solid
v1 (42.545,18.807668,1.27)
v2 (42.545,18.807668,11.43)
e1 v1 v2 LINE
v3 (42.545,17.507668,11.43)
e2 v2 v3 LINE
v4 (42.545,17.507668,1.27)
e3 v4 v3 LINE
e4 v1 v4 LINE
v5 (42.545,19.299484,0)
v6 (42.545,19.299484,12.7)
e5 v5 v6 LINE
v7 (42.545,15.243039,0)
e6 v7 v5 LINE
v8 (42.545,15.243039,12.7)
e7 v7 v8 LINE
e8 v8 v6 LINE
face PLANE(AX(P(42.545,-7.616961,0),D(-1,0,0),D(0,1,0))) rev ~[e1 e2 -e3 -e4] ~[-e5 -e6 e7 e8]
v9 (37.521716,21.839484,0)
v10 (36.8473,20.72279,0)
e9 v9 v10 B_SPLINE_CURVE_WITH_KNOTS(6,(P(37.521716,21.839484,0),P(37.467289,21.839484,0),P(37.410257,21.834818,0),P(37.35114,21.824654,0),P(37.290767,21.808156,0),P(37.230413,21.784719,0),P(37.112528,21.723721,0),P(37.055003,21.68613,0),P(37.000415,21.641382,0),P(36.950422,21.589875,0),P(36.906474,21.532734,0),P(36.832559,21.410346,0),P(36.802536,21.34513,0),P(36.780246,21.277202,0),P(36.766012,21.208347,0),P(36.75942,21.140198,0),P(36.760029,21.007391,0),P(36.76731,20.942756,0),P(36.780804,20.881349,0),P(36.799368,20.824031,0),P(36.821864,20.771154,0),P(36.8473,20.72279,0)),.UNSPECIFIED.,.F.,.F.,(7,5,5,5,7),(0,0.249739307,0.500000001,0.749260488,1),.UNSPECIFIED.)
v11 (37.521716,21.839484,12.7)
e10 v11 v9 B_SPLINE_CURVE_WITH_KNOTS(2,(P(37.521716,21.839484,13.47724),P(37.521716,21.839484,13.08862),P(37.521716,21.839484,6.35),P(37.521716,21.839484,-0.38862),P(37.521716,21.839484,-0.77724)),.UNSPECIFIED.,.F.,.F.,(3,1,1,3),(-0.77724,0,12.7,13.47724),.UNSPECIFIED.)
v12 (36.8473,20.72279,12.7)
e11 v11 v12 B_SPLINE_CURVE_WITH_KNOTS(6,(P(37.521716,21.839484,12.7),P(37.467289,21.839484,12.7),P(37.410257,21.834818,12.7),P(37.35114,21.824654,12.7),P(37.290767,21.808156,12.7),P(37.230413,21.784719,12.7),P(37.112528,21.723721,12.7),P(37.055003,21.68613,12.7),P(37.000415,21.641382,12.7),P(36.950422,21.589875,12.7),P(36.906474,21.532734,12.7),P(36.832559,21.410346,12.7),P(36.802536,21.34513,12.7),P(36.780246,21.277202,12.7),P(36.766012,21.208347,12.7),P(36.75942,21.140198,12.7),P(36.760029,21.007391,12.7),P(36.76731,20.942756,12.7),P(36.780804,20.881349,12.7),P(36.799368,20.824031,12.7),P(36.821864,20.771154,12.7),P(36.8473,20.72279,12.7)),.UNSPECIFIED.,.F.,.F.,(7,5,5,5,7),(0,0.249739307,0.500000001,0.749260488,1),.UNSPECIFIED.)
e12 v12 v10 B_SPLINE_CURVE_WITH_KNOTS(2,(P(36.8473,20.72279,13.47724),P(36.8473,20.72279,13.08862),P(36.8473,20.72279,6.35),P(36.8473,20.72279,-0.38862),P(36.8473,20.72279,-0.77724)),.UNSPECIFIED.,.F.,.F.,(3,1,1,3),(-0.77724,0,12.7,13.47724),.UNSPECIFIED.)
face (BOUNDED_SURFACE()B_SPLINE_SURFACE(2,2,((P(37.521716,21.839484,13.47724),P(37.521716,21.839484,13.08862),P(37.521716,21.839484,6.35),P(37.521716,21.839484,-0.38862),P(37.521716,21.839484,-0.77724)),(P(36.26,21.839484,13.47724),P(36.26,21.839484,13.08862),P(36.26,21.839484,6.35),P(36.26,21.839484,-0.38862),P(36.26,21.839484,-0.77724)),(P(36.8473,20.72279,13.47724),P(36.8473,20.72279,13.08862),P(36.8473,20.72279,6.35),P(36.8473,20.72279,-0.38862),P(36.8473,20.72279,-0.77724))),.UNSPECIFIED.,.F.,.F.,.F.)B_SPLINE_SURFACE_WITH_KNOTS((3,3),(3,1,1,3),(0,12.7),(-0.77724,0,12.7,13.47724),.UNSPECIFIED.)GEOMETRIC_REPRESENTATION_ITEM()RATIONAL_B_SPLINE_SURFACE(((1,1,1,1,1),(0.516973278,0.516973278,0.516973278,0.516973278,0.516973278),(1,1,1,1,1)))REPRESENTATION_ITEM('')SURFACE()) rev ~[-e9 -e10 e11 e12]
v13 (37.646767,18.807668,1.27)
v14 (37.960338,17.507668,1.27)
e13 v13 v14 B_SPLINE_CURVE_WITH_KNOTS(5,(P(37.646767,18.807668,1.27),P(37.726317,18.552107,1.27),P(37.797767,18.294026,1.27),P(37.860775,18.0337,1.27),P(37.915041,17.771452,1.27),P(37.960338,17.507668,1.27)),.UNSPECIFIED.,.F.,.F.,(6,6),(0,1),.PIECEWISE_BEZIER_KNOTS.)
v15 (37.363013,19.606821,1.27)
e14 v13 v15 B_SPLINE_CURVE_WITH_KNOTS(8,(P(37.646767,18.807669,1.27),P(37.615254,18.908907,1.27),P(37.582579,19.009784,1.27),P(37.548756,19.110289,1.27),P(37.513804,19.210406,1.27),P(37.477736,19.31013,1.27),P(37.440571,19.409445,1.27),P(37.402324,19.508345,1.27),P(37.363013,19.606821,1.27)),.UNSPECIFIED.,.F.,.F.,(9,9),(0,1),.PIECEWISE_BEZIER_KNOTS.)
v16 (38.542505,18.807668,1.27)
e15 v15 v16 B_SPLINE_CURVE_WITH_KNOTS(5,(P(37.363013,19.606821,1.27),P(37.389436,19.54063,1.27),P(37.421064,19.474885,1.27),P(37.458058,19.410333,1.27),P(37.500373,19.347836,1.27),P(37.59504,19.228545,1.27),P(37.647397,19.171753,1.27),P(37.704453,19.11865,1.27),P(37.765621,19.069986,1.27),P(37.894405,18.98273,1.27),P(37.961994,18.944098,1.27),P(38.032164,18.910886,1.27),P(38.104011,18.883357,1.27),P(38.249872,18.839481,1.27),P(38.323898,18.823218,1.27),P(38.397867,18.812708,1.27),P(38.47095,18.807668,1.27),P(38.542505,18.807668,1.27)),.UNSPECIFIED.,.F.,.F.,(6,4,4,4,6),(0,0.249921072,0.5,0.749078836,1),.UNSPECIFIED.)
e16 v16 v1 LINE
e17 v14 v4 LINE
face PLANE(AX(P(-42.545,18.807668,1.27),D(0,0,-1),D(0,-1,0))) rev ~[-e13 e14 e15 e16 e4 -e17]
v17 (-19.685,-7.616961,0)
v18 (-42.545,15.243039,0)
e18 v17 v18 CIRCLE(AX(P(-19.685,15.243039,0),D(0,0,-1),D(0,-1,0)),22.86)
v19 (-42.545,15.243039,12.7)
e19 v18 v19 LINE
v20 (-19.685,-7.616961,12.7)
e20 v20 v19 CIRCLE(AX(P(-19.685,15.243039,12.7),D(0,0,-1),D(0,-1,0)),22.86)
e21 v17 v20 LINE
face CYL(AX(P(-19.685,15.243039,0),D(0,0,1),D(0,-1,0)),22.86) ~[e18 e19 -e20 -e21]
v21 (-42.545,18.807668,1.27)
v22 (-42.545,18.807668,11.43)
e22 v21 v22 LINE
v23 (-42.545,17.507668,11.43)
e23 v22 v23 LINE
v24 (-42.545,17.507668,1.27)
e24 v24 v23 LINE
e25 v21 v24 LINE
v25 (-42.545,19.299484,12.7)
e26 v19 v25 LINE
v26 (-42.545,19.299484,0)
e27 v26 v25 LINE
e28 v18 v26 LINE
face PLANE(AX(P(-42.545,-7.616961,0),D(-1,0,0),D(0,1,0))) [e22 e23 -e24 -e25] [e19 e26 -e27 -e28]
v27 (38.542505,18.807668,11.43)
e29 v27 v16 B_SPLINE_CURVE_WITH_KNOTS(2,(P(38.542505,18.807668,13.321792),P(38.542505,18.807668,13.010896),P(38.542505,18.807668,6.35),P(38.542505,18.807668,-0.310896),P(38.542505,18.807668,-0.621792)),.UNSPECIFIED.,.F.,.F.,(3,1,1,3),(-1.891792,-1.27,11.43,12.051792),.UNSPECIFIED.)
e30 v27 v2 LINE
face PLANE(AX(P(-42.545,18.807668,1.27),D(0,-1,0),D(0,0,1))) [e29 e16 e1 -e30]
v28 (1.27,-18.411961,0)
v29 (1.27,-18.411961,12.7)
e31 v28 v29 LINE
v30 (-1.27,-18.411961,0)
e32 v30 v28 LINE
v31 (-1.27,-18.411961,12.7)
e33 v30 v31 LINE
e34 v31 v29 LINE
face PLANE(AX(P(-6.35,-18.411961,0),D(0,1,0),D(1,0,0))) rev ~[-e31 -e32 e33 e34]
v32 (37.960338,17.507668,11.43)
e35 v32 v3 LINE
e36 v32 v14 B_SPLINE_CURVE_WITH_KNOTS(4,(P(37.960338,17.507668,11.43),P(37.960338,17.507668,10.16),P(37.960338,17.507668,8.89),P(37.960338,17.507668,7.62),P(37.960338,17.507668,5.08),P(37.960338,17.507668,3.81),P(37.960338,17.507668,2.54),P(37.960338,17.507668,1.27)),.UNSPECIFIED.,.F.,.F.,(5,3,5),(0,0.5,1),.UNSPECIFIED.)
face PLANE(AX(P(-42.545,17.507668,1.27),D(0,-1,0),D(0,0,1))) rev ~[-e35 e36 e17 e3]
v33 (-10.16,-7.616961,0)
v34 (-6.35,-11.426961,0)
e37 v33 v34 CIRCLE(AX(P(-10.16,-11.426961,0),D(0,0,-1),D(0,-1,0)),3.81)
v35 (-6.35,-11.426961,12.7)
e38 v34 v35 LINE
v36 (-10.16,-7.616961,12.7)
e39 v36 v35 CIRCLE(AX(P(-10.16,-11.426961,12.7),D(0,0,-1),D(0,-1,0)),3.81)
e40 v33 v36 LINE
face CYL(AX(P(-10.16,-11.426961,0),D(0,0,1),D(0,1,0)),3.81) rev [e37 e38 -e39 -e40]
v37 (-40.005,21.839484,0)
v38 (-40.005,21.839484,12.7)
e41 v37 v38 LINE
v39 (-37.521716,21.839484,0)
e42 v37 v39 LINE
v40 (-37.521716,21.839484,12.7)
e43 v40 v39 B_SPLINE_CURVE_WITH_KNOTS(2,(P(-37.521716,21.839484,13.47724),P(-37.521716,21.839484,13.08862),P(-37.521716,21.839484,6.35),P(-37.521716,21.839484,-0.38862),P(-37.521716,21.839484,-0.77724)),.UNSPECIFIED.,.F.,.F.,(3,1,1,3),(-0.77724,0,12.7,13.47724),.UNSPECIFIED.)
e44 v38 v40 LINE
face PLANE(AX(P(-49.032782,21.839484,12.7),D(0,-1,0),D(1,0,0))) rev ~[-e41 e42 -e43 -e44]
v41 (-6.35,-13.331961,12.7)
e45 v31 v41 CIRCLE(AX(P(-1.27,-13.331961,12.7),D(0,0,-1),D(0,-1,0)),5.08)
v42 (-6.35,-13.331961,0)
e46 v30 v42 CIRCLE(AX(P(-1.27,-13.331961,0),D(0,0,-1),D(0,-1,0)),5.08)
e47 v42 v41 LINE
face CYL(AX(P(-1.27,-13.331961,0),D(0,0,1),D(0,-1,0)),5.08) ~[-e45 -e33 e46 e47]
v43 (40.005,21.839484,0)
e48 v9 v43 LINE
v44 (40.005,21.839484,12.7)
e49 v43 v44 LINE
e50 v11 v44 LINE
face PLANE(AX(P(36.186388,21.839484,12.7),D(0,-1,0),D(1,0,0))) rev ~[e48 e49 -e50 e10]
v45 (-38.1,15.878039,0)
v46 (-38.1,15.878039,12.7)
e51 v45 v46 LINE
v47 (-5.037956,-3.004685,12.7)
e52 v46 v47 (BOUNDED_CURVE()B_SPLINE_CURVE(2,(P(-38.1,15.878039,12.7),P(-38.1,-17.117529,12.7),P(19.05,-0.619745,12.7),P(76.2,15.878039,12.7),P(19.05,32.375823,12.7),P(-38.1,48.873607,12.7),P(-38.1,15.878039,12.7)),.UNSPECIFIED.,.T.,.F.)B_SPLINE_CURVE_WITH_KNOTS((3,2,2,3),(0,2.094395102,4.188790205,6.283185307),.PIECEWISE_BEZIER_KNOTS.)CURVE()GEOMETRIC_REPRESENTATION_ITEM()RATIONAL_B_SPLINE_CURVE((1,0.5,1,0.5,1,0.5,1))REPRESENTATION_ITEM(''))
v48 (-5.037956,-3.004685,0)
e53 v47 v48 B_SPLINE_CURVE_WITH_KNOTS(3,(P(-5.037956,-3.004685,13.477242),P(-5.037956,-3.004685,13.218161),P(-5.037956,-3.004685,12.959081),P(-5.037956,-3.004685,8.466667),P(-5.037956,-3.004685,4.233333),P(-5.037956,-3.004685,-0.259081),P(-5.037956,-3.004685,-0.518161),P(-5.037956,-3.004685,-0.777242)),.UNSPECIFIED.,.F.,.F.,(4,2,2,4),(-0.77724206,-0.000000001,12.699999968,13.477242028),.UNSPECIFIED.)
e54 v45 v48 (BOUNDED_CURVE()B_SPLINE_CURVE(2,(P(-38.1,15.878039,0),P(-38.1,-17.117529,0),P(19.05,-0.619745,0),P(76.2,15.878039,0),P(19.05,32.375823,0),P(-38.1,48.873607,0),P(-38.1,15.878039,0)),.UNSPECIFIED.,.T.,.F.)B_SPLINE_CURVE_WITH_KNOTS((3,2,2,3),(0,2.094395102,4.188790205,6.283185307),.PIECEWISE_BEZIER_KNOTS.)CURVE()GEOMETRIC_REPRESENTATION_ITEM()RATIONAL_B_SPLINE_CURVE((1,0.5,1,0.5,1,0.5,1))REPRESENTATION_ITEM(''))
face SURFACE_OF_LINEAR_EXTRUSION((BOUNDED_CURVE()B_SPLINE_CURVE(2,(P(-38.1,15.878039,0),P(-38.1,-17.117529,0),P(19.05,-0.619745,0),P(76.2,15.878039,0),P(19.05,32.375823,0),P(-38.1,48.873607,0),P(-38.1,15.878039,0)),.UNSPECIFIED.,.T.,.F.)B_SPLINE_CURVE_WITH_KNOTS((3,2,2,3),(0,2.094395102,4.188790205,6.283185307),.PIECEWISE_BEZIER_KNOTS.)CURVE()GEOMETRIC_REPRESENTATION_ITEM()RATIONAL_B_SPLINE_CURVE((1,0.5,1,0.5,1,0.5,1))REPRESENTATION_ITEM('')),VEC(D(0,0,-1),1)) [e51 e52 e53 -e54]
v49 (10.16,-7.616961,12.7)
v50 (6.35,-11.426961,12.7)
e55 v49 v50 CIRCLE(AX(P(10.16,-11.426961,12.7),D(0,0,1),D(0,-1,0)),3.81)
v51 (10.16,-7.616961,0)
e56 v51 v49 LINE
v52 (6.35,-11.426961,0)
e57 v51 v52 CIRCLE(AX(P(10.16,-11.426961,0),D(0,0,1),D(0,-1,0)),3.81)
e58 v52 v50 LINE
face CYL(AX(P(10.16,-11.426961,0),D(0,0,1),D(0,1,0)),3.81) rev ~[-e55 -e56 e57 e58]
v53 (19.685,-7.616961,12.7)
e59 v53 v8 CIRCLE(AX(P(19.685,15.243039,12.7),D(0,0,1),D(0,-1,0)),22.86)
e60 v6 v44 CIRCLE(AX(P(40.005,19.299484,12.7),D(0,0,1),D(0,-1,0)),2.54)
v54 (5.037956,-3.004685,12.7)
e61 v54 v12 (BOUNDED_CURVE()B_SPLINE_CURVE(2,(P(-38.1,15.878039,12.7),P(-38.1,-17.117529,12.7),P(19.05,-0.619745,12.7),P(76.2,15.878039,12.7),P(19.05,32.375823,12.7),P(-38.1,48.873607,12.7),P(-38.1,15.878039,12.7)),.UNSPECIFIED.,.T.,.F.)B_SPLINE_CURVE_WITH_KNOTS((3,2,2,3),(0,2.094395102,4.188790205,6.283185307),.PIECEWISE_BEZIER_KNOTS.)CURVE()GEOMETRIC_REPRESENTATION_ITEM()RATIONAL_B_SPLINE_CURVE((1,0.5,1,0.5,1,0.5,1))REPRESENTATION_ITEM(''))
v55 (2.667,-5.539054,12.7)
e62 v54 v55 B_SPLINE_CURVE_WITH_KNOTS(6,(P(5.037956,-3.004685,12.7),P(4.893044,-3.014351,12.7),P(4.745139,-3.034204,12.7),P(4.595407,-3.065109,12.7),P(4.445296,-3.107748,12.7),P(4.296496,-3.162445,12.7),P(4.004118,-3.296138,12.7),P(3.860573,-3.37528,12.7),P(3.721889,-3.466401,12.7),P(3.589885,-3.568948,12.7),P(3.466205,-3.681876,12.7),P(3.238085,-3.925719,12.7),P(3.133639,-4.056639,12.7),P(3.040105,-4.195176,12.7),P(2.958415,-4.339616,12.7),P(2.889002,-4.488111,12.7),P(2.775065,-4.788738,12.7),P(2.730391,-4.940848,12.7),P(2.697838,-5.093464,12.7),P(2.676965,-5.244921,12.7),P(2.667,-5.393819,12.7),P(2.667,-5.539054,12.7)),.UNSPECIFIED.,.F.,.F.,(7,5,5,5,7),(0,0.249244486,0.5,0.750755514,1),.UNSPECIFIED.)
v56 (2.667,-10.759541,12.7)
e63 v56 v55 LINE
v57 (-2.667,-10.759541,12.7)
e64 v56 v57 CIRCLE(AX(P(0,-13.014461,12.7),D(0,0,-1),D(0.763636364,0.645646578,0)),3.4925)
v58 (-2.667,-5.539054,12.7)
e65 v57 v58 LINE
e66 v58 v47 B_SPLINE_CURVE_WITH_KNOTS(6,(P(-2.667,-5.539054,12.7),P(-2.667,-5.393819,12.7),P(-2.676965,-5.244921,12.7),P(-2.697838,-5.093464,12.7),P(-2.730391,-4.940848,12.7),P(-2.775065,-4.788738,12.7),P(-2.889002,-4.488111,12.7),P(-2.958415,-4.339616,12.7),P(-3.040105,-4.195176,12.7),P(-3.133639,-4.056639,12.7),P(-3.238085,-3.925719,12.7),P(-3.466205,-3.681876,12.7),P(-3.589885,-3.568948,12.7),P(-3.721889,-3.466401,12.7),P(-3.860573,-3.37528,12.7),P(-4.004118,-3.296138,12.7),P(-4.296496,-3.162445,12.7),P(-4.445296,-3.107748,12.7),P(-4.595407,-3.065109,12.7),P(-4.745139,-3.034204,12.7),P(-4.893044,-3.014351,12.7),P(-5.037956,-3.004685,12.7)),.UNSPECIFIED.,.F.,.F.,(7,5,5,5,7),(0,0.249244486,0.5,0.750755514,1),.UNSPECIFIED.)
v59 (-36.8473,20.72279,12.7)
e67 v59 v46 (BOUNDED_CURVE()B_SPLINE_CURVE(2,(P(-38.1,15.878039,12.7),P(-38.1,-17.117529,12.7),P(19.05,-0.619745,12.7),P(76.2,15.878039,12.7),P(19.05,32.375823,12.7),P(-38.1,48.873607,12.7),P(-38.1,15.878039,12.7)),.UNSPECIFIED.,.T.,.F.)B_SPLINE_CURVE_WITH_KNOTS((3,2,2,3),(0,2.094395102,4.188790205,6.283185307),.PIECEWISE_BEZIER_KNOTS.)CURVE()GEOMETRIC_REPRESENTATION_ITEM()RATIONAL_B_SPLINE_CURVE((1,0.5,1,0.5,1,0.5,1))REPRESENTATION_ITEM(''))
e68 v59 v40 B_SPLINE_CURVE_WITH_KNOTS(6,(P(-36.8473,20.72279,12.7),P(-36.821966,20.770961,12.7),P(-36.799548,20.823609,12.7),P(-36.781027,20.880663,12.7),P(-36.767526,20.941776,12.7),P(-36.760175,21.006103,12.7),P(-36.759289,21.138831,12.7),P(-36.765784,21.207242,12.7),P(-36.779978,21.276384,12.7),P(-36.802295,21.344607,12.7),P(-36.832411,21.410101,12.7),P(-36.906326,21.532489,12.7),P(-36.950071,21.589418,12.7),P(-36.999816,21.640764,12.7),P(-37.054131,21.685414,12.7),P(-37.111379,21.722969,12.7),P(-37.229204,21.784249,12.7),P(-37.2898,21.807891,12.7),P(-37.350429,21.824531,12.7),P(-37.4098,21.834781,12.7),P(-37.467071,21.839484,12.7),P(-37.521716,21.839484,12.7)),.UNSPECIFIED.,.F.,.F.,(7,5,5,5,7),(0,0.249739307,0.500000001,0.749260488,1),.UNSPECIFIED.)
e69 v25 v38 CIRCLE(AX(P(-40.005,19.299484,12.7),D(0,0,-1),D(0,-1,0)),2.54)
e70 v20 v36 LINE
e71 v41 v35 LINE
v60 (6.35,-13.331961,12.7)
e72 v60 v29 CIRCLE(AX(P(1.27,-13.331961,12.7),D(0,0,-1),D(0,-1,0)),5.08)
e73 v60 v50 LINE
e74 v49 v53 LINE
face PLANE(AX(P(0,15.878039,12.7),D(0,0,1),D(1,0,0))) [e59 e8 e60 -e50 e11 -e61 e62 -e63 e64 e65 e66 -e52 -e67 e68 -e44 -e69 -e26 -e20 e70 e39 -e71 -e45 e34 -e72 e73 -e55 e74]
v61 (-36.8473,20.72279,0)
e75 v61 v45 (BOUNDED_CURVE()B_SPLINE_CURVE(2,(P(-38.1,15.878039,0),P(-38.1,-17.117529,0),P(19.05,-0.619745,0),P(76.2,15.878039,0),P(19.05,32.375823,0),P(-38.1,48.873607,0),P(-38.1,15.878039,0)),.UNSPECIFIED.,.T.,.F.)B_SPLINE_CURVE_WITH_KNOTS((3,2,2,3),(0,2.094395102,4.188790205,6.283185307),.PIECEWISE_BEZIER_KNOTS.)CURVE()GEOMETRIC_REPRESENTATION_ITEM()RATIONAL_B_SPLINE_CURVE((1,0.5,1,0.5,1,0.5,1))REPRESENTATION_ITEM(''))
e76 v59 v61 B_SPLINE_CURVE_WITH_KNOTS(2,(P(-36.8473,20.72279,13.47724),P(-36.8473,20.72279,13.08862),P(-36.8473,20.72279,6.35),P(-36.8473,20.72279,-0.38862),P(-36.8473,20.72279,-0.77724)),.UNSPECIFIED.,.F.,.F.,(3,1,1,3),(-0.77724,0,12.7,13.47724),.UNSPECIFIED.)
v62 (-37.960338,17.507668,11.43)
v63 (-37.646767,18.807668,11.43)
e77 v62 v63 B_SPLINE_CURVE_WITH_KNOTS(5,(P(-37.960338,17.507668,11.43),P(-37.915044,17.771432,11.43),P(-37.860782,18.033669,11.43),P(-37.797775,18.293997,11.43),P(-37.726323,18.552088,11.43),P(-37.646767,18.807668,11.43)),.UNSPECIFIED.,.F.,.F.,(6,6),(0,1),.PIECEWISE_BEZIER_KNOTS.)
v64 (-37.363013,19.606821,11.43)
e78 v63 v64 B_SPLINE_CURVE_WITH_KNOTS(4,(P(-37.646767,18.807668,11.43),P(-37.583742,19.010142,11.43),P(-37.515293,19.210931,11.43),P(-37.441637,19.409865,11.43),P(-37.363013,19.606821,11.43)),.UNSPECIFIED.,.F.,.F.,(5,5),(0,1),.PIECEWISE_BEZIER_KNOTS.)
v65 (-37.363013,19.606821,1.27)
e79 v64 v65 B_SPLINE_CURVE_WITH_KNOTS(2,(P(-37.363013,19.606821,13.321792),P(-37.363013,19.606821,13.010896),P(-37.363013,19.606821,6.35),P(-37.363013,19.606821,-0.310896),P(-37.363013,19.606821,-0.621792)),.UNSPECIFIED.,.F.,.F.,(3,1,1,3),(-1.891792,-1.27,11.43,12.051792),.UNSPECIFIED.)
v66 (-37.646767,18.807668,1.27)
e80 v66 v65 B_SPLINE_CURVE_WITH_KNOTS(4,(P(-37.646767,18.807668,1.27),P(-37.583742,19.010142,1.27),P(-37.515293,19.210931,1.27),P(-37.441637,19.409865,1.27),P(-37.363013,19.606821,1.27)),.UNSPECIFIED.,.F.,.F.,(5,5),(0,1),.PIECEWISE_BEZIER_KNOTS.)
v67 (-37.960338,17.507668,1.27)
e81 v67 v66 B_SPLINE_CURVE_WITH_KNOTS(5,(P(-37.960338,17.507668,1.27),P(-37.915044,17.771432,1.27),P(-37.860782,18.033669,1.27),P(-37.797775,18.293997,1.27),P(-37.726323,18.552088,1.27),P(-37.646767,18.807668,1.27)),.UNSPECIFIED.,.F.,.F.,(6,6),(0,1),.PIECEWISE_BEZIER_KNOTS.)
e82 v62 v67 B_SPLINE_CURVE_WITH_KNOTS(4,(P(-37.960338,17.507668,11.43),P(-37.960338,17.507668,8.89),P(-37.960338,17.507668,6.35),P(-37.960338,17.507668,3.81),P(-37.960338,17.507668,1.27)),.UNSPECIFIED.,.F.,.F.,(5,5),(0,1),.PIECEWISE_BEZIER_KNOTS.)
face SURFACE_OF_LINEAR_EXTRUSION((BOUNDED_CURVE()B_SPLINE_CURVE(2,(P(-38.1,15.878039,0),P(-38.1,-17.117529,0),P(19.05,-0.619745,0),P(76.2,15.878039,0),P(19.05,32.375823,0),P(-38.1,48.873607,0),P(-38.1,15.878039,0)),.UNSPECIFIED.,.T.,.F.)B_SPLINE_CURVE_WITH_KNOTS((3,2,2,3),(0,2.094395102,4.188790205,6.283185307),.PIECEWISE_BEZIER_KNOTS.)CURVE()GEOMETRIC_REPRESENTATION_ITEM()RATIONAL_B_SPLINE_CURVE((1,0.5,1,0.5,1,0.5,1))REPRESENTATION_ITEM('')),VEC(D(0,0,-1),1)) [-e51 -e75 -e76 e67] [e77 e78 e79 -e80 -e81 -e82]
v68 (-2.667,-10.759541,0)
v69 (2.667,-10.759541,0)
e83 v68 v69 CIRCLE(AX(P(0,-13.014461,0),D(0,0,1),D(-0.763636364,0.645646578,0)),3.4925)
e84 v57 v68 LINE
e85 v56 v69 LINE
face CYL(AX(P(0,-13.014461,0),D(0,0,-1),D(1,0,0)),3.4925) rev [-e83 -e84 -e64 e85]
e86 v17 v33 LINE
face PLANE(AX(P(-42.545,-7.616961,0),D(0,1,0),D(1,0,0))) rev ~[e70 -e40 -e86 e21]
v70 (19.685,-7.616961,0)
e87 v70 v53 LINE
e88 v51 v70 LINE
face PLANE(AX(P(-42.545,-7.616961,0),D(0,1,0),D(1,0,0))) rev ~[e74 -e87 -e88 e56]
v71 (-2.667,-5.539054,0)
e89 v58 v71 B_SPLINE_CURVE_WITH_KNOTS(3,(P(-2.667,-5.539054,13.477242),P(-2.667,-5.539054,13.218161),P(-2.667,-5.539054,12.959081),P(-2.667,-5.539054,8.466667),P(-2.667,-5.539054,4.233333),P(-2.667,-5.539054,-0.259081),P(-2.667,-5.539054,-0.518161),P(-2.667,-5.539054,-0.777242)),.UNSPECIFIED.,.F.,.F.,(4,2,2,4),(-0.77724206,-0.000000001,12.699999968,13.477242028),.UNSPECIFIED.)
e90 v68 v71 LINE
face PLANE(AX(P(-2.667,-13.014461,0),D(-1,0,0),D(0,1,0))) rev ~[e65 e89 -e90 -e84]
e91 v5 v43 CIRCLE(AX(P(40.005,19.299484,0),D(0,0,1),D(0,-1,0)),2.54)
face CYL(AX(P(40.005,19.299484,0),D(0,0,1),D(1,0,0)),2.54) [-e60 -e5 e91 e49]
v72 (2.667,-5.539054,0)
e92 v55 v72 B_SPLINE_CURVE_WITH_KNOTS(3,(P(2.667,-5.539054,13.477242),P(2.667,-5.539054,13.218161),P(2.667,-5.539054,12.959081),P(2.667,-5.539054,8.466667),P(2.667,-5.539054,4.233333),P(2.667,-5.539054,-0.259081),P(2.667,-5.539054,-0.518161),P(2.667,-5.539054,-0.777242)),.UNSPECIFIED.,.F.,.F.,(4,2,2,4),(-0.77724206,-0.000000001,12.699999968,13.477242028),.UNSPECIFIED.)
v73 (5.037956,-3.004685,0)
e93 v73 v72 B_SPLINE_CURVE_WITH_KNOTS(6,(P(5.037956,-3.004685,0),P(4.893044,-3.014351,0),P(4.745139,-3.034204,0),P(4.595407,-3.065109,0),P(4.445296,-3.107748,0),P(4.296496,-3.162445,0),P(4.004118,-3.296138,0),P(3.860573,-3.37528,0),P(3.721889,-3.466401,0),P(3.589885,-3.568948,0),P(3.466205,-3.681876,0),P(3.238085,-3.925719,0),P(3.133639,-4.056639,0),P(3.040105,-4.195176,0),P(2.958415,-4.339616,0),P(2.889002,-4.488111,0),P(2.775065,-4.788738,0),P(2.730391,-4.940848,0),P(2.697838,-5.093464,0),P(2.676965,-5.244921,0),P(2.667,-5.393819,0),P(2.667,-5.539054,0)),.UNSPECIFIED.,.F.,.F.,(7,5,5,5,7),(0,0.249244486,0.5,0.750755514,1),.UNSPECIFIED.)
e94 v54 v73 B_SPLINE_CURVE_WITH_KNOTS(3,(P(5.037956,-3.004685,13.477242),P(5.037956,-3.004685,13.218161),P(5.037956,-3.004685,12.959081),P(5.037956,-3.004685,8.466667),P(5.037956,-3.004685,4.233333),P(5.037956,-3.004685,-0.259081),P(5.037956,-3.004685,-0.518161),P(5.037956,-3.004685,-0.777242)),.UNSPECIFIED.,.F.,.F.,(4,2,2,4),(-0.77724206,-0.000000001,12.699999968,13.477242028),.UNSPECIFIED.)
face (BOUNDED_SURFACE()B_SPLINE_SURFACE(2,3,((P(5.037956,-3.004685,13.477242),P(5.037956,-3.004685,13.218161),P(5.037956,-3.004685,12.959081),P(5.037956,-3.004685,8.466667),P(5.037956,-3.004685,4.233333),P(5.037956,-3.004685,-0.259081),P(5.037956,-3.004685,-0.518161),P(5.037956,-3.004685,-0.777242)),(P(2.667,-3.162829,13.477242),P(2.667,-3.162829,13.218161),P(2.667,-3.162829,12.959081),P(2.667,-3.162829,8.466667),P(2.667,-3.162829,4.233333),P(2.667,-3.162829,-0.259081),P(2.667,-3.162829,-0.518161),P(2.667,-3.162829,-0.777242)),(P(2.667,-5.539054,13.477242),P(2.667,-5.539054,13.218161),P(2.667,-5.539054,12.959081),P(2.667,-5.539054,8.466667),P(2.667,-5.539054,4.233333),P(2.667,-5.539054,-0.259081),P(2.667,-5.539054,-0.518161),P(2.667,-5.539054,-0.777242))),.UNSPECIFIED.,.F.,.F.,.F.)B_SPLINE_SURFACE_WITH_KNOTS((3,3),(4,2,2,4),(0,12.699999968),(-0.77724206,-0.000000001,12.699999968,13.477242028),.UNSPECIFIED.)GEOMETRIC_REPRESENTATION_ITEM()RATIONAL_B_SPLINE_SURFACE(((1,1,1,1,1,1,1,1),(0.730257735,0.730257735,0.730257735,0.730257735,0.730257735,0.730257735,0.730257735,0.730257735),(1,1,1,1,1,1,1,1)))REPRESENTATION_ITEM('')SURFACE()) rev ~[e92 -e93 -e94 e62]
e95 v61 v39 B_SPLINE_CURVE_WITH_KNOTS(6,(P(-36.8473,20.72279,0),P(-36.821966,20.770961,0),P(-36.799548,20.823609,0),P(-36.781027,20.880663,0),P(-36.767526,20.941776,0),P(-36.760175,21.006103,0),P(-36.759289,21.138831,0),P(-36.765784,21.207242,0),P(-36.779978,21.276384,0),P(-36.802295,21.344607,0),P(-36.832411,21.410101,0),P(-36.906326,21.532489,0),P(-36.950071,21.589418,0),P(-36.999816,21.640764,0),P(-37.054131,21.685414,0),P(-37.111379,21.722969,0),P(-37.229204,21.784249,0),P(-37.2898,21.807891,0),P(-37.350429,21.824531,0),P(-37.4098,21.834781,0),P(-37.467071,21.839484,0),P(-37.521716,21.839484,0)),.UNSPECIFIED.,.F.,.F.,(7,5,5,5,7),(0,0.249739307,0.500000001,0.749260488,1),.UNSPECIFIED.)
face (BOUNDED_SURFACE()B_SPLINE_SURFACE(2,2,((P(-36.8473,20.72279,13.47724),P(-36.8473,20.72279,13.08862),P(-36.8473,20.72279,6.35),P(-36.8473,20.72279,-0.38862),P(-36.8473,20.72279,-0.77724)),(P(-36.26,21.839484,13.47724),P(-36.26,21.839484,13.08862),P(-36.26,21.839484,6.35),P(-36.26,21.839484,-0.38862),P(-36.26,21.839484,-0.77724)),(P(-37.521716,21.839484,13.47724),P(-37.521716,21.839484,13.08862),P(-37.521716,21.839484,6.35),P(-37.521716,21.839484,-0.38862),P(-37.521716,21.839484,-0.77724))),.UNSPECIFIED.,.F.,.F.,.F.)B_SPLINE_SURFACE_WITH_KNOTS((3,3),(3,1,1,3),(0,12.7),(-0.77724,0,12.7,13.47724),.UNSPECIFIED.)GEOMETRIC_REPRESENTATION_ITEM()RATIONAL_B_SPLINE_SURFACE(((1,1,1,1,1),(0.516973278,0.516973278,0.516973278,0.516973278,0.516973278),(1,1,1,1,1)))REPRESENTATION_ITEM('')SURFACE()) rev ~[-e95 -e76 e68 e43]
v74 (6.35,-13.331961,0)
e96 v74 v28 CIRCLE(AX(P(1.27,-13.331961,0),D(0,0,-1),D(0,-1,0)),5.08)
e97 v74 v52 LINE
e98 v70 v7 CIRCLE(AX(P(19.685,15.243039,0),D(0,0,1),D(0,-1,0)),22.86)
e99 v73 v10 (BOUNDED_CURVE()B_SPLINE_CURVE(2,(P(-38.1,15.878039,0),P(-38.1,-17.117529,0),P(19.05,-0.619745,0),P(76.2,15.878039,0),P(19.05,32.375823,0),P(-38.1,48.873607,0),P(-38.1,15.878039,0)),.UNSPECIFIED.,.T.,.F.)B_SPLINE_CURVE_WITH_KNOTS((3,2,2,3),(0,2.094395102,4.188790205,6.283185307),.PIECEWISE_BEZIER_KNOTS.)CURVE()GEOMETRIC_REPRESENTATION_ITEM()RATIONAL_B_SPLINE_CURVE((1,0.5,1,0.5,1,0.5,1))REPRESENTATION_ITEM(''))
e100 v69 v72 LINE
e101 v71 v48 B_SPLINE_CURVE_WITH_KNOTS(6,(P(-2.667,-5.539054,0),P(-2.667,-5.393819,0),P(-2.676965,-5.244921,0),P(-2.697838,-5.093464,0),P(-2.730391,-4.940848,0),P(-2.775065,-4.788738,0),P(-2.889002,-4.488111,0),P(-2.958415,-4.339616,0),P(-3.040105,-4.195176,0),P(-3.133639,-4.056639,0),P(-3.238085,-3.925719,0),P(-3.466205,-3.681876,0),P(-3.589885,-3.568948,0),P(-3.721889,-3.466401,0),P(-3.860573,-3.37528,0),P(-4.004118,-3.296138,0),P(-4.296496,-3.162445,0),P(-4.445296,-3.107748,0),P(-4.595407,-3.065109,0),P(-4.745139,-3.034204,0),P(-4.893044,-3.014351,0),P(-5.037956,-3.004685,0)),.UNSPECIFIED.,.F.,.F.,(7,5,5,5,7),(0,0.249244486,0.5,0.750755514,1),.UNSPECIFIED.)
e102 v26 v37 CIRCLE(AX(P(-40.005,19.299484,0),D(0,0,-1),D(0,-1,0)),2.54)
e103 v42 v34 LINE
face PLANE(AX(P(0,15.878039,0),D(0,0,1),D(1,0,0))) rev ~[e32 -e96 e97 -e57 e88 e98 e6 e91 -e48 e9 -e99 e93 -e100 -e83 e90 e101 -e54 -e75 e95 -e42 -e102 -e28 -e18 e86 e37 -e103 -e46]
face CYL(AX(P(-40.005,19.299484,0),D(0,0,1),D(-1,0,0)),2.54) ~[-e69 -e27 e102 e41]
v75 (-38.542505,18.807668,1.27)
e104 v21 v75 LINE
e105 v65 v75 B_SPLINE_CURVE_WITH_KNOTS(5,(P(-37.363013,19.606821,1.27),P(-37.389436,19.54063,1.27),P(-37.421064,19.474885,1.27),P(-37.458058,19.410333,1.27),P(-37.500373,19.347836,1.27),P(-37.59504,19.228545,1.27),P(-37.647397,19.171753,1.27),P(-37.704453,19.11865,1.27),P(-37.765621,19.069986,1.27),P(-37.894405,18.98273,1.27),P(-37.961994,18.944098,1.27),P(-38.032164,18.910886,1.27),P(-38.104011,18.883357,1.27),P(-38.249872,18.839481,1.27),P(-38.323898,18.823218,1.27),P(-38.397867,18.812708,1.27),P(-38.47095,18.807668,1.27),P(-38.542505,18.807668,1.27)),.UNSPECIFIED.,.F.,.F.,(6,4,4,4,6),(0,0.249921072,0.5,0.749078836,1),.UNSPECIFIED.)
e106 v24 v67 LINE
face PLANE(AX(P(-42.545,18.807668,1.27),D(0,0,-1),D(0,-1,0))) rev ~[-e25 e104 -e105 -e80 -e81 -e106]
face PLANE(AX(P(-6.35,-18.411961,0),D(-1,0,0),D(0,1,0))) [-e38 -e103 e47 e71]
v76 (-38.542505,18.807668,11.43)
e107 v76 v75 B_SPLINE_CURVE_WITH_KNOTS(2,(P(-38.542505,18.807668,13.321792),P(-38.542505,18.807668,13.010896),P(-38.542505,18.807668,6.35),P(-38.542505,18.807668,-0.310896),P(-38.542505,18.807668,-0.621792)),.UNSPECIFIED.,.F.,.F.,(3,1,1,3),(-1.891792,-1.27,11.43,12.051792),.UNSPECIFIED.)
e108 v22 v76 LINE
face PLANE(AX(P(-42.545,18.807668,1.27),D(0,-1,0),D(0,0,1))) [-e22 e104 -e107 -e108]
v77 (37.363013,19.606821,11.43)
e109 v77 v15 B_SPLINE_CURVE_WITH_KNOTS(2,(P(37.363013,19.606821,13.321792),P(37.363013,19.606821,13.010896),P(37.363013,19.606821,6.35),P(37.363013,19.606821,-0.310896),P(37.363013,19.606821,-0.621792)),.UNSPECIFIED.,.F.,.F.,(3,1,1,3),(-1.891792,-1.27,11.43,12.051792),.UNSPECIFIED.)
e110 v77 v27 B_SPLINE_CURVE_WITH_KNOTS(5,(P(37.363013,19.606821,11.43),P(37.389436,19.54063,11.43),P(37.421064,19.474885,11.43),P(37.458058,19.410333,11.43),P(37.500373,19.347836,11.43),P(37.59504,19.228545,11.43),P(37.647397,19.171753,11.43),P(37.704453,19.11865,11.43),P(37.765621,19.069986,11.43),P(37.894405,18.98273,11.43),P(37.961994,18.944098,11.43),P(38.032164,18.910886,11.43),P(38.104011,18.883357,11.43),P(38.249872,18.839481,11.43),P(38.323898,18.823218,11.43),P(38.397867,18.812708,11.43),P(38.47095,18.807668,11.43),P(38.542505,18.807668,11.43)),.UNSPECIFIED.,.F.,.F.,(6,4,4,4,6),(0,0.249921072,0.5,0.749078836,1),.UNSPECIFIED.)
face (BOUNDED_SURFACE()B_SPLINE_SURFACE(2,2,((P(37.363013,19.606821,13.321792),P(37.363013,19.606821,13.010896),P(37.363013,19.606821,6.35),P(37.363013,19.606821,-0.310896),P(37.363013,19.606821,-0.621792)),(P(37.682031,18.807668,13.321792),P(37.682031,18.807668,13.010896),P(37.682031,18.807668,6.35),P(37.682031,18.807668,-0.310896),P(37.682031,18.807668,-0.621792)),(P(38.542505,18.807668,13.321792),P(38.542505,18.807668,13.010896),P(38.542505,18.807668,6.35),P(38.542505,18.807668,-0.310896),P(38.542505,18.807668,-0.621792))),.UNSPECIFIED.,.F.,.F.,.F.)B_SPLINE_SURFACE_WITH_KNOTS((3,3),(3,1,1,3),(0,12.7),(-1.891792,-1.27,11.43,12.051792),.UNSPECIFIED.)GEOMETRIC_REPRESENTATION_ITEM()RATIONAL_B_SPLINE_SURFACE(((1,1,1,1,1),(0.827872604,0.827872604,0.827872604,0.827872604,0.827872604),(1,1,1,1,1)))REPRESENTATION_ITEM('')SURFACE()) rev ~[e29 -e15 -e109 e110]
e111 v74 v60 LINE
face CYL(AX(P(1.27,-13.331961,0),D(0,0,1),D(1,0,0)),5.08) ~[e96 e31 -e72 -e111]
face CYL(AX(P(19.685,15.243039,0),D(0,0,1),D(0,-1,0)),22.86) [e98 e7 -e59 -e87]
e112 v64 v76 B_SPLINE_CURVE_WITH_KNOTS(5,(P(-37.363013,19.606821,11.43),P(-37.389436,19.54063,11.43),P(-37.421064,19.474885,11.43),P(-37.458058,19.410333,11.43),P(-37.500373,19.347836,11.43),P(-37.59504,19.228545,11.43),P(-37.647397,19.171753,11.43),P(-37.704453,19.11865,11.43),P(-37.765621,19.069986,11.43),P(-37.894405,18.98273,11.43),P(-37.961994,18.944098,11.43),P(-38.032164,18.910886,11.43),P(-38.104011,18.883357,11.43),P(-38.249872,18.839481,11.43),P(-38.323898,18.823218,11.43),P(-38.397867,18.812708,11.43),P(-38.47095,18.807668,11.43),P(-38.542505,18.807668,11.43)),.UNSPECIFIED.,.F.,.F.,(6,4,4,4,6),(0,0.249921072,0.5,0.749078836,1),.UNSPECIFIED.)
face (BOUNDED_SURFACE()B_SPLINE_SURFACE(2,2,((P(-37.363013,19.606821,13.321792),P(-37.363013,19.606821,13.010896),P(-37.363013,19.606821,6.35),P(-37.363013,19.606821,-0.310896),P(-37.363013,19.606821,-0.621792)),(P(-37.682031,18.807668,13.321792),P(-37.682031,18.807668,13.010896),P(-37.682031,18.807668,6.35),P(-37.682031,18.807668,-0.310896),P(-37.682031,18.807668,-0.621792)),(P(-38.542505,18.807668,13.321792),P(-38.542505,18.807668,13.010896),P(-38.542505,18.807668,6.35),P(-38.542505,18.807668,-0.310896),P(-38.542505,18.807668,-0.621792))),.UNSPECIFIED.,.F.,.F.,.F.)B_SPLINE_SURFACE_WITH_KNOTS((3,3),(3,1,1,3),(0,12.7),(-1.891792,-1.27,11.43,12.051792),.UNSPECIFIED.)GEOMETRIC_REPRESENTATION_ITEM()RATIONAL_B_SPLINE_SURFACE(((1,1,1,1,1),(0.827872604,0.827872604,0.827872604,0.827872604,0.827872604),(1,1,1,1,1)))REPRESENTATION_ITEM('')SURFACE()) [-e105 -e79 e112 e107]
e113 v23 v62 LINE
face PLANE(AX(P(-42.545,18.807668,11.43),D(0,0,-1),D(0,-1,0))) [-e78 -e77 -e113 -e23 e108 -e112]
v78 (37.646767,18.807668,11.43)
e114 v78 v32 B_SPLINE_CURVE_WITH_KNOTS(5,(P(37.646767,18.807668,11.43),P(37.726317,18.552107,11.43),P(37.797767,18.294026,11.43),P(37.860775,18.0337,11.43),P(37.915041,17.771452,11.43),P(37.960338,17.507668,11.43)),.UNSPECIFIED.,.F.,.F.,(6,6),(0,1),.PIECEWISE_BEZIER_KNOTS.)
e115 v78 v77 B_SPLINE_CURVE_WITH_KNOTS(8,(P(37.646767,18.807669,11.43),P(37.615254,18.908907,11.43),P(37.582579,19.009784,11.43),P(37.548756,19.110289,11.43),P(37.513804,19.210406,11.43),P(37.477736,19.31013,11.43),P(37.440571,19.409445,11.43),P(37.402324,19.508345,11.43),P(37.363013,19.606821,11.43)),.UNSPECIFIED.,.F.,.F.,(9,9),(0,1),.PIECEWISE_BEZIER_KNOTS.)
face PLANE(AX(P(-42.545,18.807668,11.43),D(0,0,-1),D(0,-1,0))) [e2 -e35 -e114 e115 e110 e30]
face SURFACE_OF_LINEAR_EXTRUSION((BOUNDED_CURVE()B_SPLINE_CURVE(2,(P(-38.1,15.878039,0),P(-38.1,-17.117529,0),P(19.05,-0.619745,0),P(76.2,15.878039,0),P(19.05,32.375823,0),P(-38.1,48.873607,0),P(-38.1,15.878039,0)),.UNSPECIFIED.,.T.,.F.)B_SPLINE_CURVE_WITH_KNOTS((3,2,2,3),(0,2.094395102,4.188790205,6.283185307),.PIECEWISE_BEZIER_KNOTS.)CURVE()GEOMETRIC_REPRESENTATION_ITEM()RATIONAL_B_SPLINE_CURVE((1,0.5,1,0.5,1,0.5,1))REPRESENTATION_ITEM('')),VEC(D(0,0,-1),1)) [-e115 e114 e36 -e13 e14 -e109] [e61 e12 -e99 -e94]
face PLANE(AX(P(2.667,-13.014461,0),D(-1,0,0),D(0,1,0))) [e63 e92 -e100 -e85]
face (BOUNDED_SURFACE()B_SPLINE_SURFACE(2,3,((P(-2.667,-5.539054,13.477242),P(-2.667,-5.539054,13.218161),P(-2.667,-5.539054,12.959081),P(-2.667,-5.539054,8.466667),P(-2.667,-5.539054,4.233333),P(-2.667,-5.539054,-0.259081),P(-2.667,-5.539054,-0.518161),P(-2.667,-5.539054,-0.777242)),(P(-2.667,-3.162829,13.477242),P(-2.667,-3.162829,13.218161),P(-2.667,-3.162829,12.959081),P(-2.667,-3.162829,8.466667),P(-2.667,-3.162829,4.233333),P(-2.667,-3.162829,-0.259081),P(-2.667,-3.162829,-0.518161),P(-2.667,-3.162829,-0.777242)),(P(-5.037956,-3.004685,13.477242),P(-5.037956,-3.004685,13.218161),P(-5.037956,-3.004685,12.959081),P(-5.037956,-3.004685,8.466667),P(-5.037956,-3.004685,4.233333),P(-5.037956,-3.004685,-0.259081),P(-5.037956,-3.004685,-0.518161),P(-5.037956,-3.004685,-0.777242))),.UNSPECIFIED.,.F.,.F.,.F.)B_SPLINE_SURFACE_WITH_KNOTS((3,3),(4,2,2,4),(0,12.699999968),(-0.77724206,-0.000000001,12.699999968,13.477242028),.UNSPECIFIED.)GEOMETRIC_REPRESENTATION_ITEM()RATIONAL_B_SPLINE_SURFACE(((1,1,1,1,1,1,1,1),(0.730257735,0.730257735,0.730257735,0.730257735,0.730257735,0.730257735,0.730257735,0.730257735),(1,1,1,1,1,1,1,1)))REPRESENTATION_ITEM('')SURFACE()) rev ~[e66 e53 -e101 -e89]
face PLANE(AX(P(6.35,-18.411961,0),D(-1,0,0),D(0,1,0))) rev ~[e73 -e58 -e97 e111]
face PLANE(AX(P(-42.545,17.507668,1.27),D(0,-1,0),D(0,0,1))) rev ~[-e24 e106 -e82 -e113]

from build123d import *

# Parameters (mm, degrees)
F2_W      = 12.7
F2_H      = 10.795
F5_DEPTH  = 12.7
F0_W      = 85.09
F0_H      = 46.99
F7_DEPTH  = 12.7
F3_R      = 3.4925
F4_W      = 5.334
F4_H      = 12.7
F8_DEPTH  = 12.7
F10_DEPTH = 12.7
F12_R     = 3.81
F13_R     = 22.86
F14_R     = 5.08
F15_R     = 2.54
F16_R     = 0.762
F17_W     = 1.3
F17_H     = 10.16
F18_DEPTH = 88.9
F19_R     = 1.27


# Not quite as in the source:
# - a feature of the source that left no trace in its solid (it failed there, or was rolled back) is left out


with BuildPart() as f5:
    # F2 (on Top) → F5 (new body)
    with BuildSketch(Plane.XY):
        with Locations((0, -13.0144613445)):
            Rectangle(F2_W, F2_H)
    extrude(amount=F5_DEPTH)


with BuildPart() as f5b:
    # F0 (on Top) → F5, piece 2 (new body)
    with BuildSketch(Plane.XY):
        with Locations((0, 15.8780386555)):
            Rectangle(F0_W, F0_H)
    extrude(amount=F5_DEPTH)

    # F6: union F5
    add(f5.part)

    # F1 (on face) → F7 (cut)
    with BuildSketch(Plane.XY):
        with BuildLine():
            add(Edge.make_bspline(
                [(-38.1, 15.8780386555), (-38.1, -17.1175292287), (19.05, -0.6197452866), (76.2, 15.8780386555), (19.05, 32.3758225976), (-38.1, 48.8736065397), (-38.1, 15.8780386555)],
                knots=[0, 0, 0, 2.0943951024, 2.0943951024, 4.1887902048, 4.1887902048, 6.2831853072, 6.2831853072, 6.2831853072], degree=2, weights=[1, 0.5, 1, 0.5, 1, 0.5, 1]))
        make_face()
    extrude(amount=F7_DEPTH, mode=Mode.SUBTRACT)

    # F3 (on Top) + F4 (on Top) → F8 (cut)
    with BuildSketch(Plane.XY):
        with Locations((0, -13.0144613445)):
            Circle(F3_R)
    with BuildSketch(Plane.XY):
        with Locations((0, -6.6644613445)):
            Rectangle(F4_W, F4_H)
    extrude(amount=F8_DEPTH, mode=Mode.SUBTRACT)

    # F9 (on face) → F10 (cut)
    with BuildSketch(Plane.XY.offset(12.7)):
        Polygon((48.7572182757, 21.839483929), (48.7572182757, 42.4993435767), (-49.0327817243, 42.4993435767), (-49.0327817243, 21.839483929), (-42.545, 21.839483929), (-42.545, 39.3730386555), (42.545, 39.3730386555), (42.545, 21.839483929), align=None)
        with BuildLine():
            Line((36.1863880624, 21.839483929), (42.545, 21.839483929))
            Line((42.545, 21.839483929), (42.545, 39.3730386555))
            Line((42.545, 39.3730386555), (-42.545, 39.3730386555))
            Line((-42.545, 39.3730386555), (-42.545, 21.839483929))
            Line((-42.545, 21.839483929), (-36.1863880624, 21.839483929))
            add(Edge.make_bspline(
                [(36.1863880624, 21.839483929), (31.637806335, 28.7420359095), (19.05, 32.3758225976), (-21.5247671589, 44.0887489683), (-36.1863880624, 21.839483929)],
                knots=[3.4327056268, 3.4327056268, 3.4327056268, 4.1887902048, 4.1887902048, 5.9279520588, 5.9279520588, 5.9279520588], degree=2, weights=[0.7693199453, 0.819498103, 1, 0.5848056911, 0.8591566387]))
        make_face()
    extrude(amount=-F10_DEPTH, mode=Mode.SUBTRACT)

    # F12
    f12_edges = [f5b.edges().sort_by_distance(p)[0] for p in [
        (-6.35, -7.616961, 6.35),
        (6.35, -7.616961, 6.35),
    ]]
    fillet(f12_edges, radius=F12_R)

    # F13
    f13_edges = [f5b.edges().sort_by_distance(p)[0] for p in [
        (-42.545, -7.616961, 6.35),
        (42.545, -7.616961, 6.35),
    ]]
    fillet(f13_edges, radius=F13_R)

    # F14
    f14_edges = [f5b.edges().sort_by_distance(p)[0] for p in [
        (-6.35, -18.411961, 6.35),
        (6.35, -18.411961, 6.35),
    ]]
    fillet(f14_edges, radius=F14_R)

    # F15
    f15_edges = [f5b.edges().sort_by_distance(p)[0] for p in [
        (-42.545, 21.839484, 6.35),
        (42.545, 21.839484, 6.35),
        (2.667, -3.125232, 6.35),
        (-2.667, -3.125232, 6.35),
    ]]
    fillet(f15_edges, radius=F15_R)

    # F16
    f16_edges = [f5b.edges().sort_by_distance(p)[0] for p in [
        (-36.186388, 21.839484, 6.35),
        (36.186388, 21.839484, 6.35),
    ]]
    fillet(f16_edges, radius=F16_R)

    # F17 (on face) → F18 (cut)
    with BuildSketch(Plane(origin=(-42.545, 0, 0), x_dir=(0, -1, 0), z_dir=(-1, 0, 0))):
        with Locations((-18.1576684117, 6.35)):
            Rectangle(F17_W, F17_H)
    extrude(amount=-F18_DEPTH, mode=Mode.SUBTRACT)

    # F19
    f19_edges = [f5b.edges().sort_by_distance(p)[0] for p in [
        (37.646767, 18.807668, 6.35),
        (-37.646767, 18.807668, 6.35),
    ]]
    fillet(f19_edges, radius=F19_R)


solid = f5b.part
